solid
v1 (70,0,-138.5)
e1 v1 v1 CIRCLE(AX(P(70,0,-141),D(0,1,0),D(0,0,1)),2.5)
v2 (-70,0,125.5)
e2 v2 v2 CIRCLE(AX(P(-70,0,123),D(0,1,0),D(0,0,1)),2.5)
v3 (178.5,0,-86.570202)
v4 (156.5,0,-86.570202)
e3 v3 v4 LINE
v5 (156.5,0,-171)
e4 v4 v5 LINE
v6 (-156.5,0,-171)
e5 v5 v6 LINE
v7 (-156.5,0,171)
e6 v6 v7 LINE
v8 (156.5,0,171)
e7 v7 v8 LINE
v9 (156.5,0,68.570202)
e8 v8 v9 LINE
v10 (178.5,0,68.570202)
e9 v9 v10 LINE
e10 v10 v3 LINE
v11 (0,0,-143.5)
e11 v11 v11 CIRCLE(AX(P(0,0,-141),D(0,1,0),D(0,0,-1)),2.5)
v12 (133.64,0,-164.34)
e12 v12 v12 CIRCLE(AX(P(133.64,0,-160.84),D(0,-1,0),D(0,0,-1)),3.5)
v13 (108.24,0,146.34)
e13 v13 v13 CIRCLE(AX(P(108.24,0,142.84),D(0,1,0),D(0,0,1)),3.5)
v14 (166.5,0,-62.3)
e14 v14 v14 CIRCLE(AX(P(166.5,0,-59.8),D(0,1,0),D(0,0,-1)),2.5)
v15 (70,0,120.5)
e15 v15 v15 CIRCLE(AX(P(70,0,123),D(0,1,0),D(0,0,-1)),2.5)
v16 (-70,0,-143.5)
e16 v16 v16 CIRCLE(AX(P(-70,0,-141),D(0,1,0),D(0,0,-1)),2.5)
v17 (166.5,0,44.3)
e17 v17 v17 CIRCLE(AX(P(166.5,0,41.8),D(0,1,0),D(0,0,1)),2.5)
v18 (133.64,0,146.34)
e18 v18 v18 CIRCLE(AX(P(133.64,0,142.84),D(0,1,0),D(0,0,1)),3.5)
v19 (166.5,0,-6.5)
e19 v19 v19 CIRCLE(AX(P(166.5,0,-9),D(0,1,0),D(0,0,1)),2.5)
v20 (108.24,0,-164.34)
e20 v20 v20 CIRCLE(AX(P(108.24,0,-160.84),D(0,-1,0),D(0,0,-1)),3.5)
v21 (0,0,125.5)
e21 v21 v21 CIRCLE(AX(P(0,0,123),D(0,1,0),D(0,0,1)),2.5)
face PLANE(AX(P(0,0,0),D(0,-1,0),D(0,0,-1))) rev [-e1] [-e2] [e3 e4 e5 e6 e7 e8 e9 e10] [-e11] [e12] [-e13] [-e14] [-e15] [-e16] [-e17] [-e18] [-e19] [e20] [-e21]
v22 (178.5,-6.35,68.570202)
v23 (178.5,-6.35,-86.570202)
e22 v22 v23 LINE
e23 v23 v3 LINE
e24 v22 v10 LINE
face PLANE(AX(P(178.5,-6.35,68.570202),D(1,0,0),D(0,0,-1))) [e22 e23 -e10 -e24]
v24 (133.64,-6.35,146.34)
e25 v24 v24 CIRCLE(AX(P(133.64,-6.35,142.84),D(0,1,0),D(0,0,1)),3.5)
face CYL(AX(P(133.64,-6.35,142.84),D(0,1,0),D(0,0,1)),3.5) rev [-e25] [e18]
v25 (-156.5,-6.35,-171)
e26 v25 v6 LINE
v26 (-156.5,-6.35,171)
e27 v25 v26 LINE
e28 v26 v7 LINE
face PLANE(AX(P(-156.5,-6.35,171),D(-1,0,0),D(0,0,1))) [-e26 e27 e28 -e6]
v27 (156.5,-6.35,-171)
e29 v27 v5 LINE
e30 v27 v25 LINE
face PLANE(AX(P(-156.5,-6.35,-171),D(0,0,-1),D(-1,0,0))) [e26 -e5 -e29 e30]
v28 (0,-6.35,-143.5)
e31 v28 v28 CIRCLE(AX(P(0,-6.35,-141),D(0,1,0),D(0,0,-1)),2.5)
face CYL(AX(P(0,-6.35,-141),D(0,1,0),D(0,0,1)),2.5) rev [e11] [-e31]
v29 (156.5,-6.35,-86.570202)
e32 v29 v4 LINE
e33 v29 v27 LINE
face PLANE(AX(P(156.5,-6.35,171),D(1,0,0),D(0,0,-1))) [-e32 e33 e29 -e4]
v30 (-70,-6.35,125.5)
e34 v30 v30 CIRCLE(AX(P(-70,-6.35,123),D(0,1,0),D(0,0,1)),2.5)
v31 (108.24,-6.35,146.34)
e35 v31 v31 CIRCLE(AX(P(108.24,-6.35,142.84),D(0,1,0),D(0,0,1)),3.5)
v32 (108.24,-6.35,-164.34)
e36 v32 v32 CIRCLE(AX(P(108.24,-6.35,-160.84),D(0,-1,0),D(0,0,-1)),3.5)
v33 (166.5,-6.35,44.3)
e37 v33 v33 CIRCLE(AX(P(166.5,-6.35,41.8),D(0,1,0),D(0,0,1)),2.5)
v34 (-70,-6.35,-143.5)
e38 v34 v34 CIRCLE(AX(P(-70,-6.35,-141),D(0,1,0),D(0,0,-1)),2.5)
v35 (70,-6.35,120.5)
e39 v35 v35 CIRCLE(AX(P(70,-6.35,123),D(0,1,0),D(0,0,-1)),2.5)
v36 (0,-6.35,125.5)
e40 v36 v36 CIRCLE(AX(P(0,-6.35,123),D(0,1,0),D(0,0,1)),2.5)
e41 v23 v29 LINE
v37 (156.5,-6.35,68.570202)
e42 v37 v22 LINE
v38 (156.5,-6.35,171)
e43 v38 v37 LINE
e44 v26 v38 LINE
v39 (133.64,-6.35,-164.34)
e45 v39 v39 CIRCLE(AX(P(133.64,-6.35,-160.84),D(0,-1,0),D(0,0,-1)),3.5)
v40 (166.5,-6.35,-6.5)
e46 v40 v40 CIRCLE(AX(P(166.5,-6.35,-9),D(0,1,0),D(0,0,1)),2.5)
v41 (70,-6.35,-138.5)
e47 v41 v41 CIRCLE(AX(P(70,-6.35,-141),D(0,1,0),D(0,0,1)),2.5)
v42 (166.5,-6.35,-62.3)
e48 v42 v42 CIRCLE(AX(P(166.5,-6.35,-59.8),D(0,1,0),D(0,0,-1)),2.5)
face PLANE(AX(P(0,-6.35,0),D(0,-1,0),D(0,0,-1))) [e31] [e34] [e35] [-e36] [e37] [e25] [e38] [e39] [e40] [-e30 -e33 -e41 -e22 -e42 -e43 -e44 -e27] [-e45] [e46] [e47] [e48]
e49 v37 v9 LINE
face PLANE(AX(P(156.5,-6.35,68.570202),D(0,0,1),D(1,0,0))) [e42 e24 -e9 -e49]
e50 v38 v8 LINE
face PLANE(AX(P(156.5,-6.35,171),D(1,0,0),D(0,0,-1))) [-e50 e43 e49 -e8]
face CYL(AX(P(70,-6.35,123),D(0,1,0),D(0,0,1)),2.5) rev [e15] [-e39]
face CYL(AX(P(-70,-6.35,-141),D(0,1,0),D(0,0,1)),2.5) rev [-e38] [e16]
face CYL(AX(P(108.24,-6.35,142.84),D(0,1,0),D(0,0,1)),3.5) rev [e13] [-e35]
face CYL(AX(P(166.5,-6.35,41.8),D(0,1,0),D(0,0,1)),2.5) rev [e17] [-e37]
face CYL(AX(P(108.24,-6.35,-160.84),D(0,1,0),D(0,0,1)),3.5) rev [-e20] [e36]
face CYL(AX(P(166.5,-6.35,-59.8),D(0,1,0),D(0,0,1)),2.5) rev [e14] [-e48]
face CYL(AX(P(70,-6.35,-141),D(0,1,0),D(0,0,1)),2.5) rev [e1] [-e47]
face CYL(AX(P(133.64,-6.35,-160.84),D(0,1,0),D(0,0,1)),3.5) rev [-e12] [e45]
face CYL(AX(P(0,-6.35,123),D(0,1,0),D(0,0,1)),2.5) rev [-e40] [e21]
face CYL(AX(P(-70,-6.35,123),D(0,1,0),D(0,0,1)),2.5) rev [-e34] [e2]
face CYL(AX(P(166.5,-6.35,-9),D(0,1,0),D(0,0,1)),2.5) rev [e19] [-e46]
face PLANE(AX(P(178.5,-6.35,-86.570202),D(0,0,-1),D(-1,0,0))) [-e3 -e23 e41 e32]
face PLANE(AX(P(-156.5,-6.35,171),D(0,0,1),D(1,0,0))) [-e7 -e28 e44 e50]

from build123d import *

# Parameters (mm, degrees)
SKETCH1_W           = 313
SKETCH1_H           = 342
BOSS_EXTRUDE1_DEPTH = 6.35
SKETCH3_W           = 22
SKETCH3_H           = 155.14040353
SKETCH3_R           = 2.5
BOSS_EXTRUDE2_DEPTH = 6.35
SKETCH2_R           = 2.5
CUT_EXTRUDE1_DEPTH  = 248.272263912
SKETCH4_R           = 3.5
CUT_EXTRUDE2_DEPTH  = 248.272263912


with BuildPart() as part:
    # Sketch1 → Boss-Extrude1 (new body)
    with BuildSketch(Plane(origin=(0, 0, 0), x_dir=(1, 0, 0), z_dir=(0, 1, 0))):
        Rectangle(SKETCH1_W, SKETCH1_H)
    extrude(amount=-BOSS_EXTRUDE1_DEPTH)

    # Sketch3 → Boss-Extrude2 (add)
    with BuildSketch(Plane(origin=(0, 0, 0), x_dir=(1, 0, 0), z_dir=(0, 1, 0))):
        with Locations((167.5, 9)):
            Rectangle(SKETCH3_W, SKETCH3_H)
        with Locations((166.5, 9)):
            Circle(SKETCH3_R, mode=Mode.SUBTRACT)
        with Locations((166.5, -41.8)):
            Circle(SKETCH3_R, mode=Mode.SUBTRACT)
        with Locations((166.5, 59.8)):
            Circle(SKETCH3_R, mode=Mode.SUBTRACT)
    extrude(amount=-BOSS_EXTRUDE2_DEPTH)

    # Sketch2 → Cut-Extrude1 (cut, through all)
    with BuildSketch(Plane(origin=(0, 0, 0), x_dir=(1, 0, 0), z_dir=(0, 1, 0))):
        with Locations((0, -123)):
            Circle(SKETCH2_R)
        with Locations((-70, -123)):
            Circle(SKETCH2_R)
        with Locations((70, -123)):
            Circle(SKETCH2_R)
        with Locations((-70, 141)):
            Circle(SKETCH2_R)
        with Locations((0, 141)):
            Circle(SKETCH2_R)
        with Locations((70, 141)):
            Circle(SKETCH2_R)
    extrude(amount=-CUT_EXTRUDE1_DEPTH, mode=Mode.SUBTRACT)

    # Sketch4 → Cut-Extrude2 (cut, through all)
    with BuildSketch(Plane(origin=(0, 0, 0), x_dir=(1, 0, 0), z_dir=(0, 1, 0))):
        with Locations((133.64, -142.84)):
            Circle(SKETCH4_R)
        with Locations((108.24, -142.84)):
            Circle(SKETCH4_R)
    cut_extrude2 = extrude(amount=-CUT_EXTRUDE2_DEPTH, mode=Mode.SUBTRACT)

    # Mirror1: Cut-Extrude2 across plane
    add(cut_extrude2.mirror(Plane(origin=(0, 0, -9), x_dir=(1, 0, 0), z_dir=(0, 0, -1))), mode=Mode.SUBTRACT)


solid = part.part
